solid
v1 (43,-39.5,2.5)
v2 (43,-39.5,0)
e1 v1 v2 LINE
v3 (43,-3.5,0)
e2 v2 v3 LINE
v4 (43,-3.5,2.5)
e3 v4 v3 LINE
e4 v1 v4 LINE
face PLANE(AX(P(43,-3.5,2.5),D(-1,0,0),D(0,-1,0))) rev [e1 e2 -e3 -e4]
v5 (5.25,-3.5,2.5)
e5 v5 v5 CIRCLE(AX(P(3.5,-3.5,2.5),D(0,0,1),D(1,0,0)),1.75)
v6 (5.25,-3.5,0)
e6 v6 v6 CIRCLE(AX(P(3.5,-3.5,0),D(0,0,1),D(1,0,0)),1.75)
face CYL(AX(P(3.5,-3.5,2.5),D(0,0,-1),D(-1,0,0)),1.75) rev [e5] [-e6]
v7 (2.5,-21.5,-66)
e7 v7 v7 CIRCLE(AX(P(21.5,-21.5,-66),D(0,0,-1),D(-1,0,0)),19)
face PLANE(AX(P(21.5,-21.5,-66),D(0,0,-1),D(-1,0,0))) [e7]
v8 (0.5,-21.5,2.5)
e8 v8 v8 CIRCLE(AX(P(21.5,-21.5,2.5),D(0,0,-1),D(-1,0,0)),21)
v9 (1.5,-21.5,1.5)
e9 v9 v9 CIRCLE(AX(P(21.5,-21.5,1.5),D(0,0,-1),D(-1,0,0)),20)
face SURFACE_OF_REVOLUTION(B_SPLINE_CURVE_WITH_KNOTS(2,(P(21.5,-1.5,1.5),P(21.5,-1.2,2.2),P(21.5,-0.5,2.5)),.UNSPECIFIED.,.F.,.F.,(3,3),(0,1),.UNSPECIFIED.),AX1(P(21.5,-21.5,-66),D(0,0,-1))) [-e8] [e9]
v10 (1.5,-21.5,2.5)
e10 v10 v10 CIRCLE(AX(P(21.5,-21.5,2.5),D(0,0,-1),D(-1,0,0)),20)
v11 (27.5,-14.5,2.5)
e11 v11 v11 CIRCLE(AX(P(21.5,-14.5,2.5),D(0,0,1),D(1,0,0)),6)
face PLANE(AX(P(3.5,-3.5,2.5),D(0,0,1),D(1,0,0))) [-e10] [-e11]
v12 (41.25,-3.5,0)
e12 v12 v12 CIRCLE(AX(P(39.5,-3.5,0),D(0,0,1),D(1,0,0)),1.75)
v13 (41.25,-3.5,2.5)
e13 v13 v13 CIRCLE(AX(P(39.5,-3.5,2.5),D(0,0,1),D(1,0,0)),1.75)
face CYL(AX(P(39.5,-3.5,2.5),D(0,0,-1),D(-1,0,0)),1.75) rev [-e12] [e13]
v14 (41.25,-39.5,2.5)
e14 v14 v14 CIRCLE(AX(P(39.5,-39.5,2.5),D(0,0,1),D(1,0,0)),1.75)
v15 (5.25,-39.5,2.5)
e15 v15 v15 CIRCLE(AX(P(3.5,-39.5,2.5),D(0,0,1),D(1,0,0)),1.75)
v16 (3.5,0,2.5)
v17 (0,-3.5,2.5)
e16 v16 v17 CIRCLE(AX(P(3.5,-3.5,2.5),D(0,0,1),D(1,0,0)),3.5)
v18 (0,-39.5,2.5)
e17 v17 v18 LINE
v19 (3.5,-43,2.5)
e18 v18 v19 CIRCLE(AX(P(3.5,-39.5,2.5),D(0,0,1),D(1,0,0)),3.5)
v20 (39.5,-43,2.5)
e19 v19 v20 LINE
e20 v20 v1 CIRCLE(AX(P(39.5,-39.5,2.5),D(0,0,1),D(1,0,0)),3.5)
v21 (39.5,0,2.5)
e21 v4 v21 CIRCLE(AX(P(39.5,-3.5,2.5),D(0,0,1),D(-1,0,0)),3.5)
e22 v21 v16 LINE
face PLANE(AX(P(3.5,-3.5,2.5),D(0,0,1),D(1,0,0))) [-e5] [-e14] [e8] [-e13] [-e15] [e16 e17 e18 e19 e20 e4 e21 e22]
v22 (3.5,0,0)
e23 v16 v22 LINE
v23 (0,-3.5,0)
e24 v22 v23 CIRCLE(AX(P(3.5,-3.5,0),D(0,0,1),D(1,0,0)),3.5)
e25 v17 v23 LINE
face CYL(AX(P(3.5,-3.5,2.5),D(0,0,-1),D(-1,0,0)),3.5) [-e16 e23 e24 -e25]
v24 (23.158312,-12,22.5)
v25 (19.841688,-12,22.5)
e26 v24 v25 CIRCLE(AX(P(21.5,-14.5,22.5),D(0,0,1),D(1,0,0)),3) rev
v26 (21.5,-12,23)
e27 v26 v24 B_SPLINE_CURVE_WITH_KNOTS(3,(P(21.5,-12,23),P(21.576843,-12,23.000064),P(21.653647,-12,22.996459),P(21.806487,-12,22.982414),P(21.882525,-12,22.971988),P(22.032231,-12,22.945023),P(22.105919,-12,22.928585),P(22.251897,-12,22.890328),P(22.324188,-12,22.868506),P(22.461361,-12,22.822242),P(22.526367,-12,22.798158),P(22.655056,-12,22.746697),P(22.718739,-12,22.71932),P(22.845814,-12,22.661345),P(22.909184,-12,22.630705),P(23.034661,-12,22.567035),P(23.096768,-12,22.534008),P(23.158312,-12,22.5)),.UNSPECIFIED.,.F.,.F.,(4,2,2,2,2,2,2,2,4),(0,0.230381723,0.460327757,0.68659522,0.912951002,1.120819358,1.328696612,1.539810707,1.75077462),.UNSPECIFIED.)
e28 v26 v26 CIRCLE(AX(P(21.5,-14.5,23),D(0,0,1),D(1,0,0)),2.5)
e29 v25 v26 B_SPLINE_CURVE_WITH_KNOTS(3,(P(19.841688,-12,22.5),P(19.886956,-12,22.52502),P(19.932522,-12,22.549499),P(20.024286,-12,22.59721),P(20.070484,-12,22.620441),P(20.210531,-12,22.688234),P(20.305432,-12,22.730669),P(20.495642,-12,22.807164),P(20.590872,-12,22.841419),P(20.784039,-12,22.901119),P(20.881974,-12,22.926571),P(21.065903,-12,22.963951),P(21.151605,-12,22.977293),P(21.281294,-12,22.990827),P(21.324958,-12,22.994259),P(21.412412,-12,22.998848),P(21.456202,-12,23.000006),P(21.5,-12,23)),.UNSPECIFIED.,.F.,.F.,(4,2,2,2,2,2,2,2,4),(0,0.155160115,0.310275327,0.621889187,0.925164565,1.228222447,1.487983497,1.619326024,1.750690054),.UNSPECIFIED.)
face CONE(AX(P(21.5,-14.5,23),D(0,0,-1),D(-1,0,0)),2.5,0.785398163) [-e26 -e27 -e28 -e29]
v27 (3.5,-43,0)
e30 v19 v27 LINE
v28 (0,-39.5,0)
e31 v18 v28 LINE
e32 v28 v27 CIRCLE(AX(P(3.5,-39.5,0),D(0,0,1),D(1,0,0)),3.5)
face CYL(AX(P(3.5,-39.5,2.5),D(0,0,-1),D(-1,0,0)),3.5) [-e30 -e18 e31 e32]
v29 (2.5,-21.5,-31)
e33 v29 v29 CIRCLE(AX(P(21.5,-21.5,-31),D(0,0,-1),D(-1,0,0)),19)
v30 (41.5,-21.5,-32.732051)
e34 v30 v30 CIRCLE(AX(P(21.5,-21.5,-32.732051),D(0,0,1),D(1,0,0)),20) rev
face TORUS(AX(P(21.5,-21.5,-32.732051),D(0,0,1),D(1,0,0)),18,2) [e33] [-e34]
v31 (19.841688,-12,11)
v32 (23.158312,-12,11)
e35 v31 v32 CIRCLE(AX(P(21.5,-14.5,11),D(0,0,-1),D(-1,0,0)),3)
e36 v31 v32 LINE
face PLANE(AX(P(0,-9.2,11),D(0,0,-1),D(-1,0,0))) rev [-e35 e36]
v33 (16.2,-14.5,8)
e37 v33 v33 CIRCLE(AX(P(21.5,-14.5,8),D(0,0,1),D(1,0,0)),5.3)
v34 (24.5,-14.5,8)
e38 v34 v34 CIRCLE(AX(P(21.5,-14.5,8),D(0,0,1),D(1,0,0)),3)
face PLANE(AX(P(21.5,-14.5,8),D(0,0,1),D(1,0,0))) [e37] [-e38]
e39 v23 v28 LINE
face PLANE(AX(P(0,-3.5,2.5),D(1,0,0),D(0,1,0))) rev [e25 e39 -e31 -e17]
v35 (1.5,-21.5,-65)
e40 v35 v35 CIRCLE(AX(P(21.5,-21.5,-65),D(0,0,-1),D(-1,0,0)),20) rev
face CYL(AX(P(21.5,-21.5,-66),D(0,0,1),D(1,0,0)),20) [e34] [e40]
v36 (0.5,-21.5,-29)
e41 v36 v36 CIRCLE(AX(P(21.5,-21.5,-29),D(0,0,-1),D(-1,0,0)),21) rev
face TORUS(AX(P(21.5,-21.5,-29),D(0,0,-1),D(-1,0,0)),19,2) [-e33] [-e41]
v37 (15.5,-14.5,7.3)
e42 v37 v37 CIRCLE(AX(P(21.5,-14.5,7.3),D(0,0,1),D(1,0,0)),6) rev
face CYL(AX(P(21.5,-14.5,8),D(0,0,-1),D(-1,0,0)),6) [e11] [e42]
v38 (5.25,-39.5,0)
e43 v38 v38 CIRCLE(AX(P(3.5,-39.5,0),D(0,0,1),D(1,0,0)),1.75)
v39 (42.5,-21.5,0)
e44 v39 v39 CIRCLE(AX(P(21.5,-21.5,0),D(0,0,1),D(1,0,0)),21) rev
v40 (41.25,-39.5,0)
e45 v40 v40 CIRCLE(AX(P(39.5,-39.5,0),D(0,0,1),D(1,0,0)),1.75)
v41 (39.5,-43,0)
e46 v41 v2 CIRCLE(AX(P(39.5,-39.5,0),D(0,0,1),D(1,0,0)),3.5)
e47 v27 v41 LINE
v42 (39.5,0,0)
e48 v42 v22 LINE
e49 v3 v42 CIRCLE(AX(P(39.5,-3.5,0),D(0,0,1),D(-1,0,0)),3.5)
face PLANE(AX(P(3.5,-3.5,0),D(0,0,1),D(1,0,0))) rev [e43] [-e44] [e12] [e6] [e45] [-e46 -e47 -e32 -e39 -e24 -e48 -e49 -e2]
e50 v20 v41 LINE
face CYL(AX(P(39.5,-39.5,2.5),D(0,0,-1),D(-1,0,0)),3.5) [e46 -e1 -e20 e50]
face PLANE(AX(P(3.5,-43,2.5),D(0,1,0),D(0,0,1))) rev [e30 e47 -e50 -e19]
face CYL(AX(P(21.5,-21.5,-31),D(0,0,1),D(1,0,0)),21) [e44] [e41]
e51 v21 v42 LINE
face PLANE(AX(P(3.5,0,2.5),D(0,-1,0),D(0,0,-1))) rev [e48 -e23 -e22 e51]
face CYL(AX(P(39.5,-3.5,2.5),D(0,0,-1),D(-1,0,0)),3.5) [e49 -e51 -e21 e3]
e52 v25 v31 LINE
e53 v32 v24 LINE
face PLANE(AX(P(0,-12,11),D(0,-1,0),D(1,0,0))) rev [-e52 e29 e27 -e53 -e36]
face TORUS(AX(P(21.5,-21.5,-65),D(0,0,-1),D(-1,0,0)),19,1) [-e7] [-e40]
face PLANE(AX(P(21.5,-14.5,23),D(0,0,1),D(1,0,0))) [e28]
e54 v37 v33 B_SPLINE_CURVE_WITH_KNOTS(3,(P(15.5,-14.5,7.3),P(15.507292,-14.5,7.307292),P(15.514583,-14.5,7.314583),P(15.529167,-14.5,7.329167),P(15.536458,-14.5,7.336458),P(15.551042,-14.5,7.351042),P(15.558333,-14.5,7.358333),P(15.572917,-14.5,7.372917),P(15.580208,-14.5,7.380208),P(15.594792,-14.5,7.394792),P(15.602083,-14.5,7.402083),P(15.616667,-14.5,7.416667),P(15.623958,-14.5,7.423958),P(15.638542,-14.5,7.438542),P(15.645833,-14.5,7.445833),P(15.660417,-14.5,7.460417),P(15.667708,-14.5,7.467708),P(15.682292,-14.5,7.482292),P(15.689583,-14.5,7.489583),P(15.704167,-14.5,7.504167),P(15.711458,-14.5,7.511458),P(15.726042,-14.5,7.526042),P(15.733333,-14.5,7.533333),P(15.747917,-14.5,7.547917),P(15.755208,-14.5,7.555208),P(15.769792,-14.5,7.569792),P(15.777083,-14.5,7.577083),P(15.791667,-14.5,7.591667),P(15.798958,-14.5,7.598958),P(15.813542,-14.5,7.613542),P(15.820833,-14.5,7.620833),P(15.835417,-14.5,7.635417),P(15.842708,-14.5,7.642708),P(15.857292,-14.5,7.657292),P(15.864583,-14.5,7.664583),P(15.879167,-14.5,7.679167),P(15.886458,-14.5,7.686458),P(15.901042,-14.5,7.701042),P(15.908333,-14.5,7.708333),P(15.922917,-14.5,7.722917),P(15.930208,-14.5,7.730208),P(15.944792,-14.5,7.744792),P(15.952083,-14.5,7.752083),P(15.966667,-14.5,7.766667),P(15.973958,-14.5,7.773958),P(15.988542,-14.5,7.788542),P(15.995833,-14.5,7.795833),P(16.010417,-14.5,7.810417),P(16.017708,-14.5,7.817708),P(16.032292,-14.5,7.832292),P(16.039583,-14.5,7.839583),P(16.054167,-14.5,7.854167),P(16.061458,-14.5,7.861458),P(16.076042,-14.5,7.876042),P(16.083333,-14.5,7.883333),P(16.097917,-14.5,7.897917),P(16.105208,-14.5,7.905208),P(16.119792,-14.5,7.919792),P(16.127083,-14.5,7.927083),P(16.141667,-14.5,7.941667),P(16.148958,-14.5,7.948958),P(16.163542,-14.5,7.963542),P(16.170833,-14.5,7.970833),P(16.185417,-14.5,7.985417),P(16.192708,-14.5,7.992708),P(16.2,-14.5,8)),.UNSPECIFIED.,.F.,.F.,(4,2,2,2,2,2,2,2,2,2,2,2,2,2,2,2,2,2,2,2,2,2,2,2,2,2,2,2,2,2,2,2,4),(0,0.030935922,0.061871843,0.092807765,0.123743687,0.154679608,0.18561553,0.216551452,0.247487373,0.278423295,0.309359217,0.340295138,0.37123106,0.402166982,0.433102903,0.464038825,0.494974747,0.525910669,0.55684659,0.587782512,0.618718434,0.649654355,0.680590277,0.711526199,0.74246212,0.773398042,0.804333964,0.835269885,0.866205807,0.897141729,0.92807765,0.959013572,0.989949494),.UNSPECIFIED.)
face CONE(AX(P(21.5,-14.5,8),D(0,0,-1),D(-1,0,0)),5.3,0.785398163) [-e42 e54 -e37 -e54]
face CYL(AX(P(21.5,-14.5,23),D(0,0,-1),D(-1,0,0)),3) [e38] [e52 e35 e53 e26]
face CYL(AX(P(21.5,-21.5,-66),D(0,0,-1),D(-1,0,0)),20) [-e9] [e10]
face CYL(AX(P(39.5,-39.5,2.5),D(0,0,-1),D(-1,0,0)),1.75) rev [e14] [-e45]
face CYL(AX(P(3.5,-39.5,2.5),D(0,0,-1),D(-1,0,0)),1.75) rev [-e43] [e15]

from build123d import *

# Parameters (mm, degrees)
SKETCH1_R           = 1.75
BOSS_EXTRUDE1_DEPTH = 2.5
SKETCH2_R           = 6
BOSS_EXTRUDE2_DEPTH = 5.5
SKETCH3_R           = 3
BOSS_EXTRUDE3_DEPTH = 15
CHAMFER1_SIZE       = 0.7
SKETCH4_W           = 12
SKETCH4_H           = 2.8
CUT_EXTRUDE1_DEPTH  = 66.015382795
CHAMFER2_SIZE       = 0.5
SKETCH5_R           = 21
BOSS_EXTRUDE4_DEPTH = 31
FILLET1_R           = 2
SKETCH6_R           = 20
BOSS_EXTRUDE5_DEPTH = 35
FILLET2_R           = 2
FILLET3_R           = 1


# Some blends are built 0.0001 mm under size
with BuildPart() as part:
    # Sketch1 → Boss-Extrude1 (new body)
    with BuildSketch(Plane.XY):
        with BuildLine():
            Line((3.5, 0), (39.5, 0))
            ThreePointArc((39.5, 0), (41.974873734, -1.025126266), (43, -3.5))
            Line((43, -3.5), (43, -39.5))
            ThreePointArc((43, -39.5), (41.974873734, -41.974873734), (39.5, -43))
            Line((39.5, -43), (3.5, -43))
            ThreePointArc((3.5, -43), (1.025126266, -41.974873734), (0, -39.5))
            Line((0, -39.5), (0, -3.5))
            ThreePointArc((0, -3.5), (1.025126266, -1.025126266), (3.5, 0))
        make_face()
        with Locations((3.5, -3.5)):
            Circle(SKETCH1_R, mode=Mode.SUBTRACT)
        with Locations((39.5, -3.5)):
            Circle(SKETCH1_R, mode=Mode.SUBTRACT)
        with Locations((3.5, -39.5)):
            Circle(SKETCH1_R, mode=Mode.SUBTRACT)
        with Locations((39.5, -39.5)):
            Circle(SKETCH1_R, mode=Mode.SUBTRACT)
    extrude(amount=BOSS_EXTRUDE1_DEPTH)

    # Sketch2 → Boss-Extrude2 (add)
    with BuildSketch(Plane.XY.offset(2.5)):
        with Locations((21.5, -14.5)):
            Circle(SKETCH2_R)
    extrude(amount=BOSS_EXTRUDE2_DEPTH)

    # Sketch3 → Boss-Extrude3 (add)
    with BuildSketch(Plane.XY.offset(8)):
        with Locations((21.5, -14.5)):
            Circle(SKETCH3_R)
    extrude(amount=BOSS_EXTRUDE3_DEPTH)

    # Chamfer1
    chamfer1_edges = [part.edges().sort_by_distance(p)[0] for p in [
        (15.5, -14.5, 8),
    ]]
    chamfer(chamfer1_edges, length=CHAMFER1_SIZE)

    # Sketch4 → Cut-Extrude1 (cut, through all)
    with BuildSketch(Plane(origin=(43, 0, 0), x_dir=(0, 0, -1), z_dir=(1, 0, 0))):
        with Locations((-17, -10.6)):
            Rectangle(SKETCH4_W, SKETCH4_H)
    extrude(amount=-CUT_EXTRUDE1_DEPTH, mode=Mode.SUBTRACT)

    # Chamfer2
    chamfer2_edges = [part.edges().sort_by_distance(p)[0] for p in [
        (20.081362835, -17.143382037, 23),
    ]]
    chamfer(chamfer2_edges, length=CHAMFER2_SIZE - 0.0001)  # a hair under: the kernel refuses the full size

    # Sketch5 → Boss-Extrude4 (add)
    with BuildSketch(Plane(origin=(0, 0, 0), x_dir=(-1, 0, 0), z_dir=(0, 0, -1))):
        with Locations(Location((-21.5, -21.5, 0), (0, 0, 180))):
            Circle(SKETCH5_R)
    extrude(amount=BOSS_EXTRUDE4_DEPTH)

    # Fillet1
    fillet1_edges = [part.edges().sort_by_distance(p)[0] for p in [
        (0.5, -21.5, -31),
    ]]
    fillet(fillet1_edges, radius=FILLET1_R)

    # Sketch6 → Boss-Extrude5 (add)
    with BuildSketch(Plane(origin=(0, 0, -31), x_dir=(-1, 0, 0), z_dir=(0, 0, -1))):
        with Locations((-21.5, -21.5)):
            Circle(SKETCH6_R)
    extrude(amount=BOSS_EXTRUDE5_DEPTH)

    # Fillet2
    # the kernel refuses this fillet: 2 mm, written as the material it takes off along each edge
    with BuildSketch(Plane(origin=(21.5, -21.5, -31), x_dir=(-1, 0, 0), z_dir=(0, -1, 0))) as fillet2_piece_1:
        with BuildLine():
            CenterArc((18, 1.732050808), FILLET2_R, 300, 60)
            Line((19, 0), (20, 0))
            Line((20, 0), (20, 1.732050808))
        make_face()
    revolve(axis=Axis((21.5, -21.5, -31), (0, 0, -1)), mode=Mode.SUBTRACT)

    # Fillet3
    fillet3_edges = [part.edges().sort_by_distance(p)[0] for p in [
        (41.5, -21.5, -66),
    ]]
    fillet(fillet3_edges, radius=FILLET3_R)

    # Sketch7 → Cut-Revolve1 (revolve, cut)
    with BuildSketch(Plane(origin=(21.5, 0, 0), x_dir=(0, 0, -1), z_dir=(1, 0, 0)), mode=Mode.PRIVATE) as cut_revolve1_sk:
        with BuildLine():
            Line((-2.5, -1.5), (-1.5, -1.5))
            add(Edge.make_bspline(
                [(-2.5, -0.5), (-2.2, -1.2), (-1.5, -1.5)],
                knots=[0, 0, 0, 1, 1, 1], degree=2))
            Line((-2.5, -0.5), (-2.5, -1.5))
        make_face()
    revolve(cut_revolve1_sk.sketch.rotate(Axis((21.5, -21.5, -66), (0, 0, 1)), 90), axis=Axis((21.5, -21.5, -66), (0, 0, 1)), mode=Mode.SUBTRACT)


solid = part.part
